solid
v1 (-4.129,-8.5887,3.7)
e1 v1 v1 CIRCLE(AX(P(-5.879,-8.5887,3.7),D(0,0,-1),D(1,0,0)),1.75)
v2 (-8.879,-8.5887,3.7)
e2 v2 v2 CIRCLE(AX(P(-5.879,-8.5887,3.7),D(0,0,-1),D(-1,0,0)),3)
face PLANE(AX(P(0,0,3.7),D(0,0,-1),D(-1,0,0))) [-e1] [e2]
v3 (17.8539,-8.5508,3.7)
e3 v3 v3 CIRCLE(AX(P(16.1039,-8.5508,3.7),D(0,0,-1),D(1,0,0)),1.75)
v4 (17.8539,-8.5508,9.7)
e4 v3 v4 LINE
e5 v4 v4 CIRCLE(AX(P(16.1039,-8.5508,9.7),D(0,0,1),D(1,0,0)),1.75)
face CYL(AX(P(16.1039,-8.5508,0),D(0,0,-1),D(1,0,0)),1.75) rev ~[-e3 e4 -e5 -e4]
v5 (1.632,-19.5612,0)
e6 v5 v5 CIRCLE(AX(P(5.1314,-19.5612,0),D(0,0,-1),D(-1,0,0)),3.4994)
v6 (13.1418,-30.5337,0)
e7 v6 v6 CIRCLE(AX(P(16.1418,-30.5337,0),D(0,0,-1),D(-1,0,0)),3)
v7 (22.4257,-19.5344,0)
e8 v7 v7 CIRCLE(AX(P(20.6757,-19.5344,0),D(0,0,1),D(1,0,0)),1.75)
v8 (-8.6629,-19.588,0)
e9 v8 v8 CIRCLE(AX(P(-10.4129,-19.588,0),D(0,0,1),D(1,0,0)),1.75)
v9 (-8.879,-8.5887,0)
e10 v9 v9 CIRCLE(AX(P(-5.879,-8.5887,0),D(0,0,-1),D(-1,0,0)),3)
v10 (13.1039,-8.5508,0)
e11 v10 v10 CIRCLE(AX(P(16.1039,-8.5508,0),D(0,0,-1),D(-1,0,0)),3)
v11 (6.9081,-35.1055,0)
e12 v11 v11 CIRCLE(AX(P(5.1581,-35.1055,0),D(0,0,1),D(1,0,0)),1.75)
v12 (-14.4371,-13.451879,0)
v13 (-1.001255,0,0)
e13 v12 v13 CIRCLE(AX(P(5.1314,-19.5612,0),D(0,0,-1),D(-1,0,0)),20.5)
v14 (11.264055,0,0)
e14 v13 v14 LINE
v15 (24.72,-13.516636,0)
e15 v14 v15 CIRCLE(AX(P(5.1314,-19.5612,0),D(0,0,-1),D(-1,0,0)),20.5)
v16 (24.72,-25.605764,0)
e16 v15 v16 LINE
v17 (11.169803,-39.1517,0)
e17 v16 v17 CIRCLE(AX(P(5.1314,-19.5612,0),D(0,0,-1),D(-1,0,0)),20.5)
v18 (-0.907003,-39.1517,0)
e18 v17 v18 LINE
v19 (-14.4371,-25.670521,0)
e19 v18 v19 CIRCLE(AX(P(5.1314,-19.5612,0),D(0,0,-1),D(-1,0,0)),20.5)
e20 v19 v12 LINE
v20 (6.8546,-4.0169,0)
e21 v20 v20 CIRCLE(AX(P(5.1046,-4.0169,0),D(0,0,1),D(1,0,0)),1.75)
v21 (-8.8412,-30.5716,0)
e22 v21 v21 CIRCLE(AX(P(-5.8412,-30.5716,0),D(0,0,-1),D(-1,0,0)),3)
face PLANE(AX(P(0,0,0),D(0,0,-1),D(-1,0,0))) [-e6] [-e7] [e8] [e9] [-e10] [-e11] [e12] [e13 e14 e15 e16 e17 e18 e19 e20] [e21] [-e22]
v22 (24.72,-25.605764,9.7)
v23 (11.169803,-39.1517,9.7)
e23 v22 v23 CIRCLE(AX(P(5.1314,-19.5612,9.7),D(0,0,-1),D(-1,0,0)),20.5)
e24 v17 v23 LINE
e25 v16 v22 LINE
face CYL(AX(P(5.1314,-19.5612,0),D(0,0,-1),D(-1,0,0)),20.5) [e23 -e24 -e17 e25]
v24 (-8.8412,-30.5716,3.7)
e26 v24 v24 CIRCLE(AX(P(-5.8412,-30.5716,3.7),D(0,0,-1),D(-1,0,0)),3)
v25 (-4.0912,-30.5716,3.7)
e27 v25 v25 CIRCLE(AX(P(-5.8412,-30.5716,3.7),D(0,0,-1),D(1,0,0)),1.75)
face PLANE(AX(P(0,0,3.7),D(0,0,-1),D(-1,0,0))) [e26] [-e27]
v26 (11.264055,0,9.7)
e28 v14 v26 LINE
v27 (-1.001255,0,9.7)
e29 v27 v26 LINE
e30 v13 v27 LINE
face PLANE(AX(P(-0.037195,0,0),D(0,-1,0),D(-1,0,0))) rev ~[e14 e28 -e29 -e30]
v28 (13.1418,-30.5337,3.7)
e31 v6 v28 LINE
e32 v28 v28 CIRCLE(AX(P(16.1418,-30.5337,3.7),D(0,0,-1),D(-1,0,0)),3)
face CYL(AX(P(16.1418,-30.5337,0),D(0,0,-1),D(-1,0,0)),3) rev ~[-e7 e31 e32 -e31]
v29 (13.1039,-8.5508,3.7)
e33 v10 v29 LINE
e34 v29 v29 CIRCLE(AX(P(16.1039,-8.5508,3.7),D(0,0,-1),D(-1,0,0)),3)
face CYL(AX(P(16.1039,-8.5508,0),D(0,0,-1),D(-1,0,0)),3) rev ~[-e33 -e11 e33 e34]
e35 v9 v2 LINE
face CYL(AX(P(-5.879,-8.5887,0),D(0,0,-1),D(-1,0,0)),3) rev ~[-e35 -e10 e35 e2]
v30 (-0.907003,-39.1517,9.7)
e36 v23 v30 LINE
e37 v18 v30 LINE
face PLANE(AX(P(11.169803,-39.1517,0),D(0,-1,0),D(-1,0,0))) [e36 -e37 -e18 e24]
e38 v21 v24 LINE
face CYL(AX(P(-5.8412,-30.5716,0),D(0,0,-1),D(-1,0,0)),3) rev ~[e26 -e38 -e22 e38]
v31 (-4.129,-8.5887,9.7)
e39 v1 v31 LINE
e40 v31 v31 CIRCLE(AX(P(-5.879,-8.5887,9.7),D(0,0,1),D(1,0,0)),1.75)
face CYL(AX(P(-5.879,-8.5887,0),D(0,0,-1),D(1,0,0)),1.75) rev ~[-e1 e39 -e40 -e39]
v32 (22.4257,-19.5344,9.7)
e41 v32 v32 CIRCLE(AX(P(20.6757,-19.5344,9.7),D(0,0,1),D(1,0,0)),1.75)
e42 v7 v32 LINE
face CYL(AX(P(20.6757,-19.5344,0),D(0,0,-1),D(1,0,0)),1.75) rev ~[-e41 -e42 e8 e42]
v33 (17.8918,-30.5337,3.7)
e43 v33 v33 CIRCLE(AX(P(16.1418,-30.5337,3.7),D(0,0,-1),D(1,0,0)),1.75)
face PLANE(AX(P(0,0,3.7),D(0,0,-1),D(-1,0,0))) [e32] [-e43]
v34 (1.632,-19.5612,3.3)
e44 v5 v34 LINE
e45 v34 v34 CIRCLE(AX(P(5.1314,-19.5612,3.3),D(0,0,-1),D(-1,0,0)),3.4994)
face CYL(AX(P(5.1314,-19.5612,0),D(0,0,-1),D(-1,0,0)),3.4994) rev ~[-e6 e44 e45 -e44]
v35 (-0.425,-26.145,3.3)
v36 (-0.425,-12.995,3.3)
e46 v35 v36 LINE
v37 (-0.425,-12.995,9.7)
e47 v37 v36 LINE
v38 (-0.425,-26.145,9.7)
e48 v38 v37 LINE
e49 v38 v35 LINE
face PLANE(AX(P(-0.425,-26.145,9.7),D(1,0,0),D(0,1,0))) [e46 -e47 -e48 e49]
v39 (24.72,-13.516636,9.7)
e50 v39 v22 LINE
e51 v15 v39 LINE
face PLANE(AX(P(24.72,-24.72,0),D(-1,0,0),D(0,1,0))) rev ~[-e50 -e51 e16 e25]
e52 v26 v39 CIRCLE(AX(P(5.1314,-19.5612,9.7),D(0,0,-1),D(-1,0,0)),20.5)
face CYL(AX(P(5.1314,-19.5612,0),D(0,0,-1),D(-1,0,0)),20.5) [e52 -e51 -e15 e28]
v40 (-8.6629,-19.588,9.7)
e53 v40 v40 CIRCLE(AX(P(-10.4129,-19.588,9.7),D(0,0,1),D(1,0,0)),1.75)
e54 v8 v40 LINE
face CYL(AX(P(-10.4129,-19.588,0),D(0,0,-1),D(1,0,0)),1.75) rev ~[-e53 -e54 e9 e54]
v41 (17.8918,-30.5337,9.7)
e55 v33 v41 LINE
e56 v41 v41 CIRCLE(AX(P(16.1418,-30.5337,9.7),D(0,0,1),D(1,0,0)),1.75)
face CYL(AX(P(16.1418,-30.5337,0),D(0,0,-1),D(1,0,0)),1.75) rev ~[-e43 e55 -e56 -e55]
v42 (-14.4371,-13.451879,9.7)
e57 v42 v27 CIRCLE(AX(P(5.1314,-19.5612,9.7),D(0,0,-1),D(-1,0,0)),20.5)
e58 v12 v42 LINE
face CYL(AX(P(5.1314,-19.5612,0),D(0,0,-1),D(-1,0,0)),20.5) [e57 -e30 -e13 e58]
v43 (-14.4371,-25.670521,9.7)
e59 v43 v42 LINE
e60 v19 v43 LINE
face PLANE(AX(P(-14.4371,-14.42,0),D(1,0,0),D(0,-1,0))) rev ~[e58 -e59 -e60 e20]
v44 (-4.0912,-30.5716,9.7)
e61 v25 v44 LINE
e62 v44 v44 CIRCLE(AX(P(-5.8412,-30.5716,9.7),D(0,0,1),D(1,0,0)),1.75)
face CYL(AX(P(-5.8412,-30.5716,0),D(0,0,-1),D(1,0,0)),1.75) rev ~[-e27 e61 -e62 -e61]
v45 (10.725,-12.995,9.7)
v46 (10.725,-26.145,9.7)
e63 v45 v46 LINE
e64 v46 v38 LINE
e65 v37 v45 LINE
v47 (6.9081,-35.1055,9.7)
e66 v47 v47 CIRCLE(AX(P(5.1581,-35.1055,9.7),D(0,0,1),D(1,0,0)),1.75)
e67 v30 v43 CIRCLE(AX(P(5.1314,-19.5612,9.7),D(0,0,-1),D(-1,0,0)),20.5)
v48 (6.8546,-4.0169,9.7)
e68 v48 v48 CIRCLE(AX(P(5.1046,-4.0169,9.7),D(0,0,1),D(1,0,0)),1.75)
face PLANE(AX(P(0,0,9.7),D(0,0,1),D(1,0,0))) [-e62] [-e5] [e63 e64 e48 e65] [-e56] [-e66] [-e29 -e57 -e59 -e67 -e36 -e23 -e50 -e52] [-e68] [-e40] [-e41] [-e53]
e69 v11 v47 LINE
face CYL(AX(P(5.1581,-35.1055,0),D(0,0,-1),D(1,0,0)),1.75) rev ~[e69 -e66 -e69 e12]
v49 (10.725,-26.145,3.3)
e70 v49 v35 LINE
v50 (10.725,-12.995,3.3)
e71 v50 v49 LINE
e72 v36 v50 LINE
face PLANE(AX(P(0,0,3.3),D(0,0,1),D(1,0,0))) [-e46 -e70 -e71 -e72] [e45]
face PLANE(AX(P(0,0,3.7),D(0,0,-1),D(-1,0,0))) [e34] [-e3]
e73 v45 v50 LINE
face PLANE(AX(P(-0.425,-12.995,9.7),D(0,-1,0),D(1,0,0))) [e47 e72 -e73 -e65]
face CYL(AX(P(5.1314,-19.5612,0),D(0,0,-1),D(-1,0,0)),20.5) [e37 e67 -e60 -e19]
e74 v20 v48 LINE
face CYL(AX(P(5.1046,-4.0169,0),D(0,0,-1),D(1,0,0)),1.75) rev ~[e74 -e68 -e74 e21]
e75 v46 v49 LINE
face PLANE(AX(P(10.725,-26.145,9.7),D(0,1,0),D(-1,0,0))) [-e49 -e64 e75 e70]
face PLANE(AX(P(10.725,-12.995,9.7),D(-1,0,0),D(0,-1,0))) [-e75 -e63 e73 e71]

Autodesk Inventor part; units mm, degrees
ref_plane "YZ Plane" through (0, 0, 0) normal (1, 0, 0) x (0, 1, 0)
ref_plane "XZ Plane" through (0, 0, 0) normal (0, 1, 0) x (-1, 0, 0)
ref_plane "XY Plane" through (0, 0, 0) normal (0, 0, 1) x (1, 0, 0)
sketch "Szkic1" plane through (0, 0, 0) normal (0, 0, 1) x (1, 0, 0)
  line L0 (24.72, -24.72) -> (24.72, -14.42)
  line L1 (25.2197, -24.72) -> (24.72, -24.72)
  line L2 (24.72, -14.42) -> (25.2197, -14.42)
  line L3 (0, -39.14) -> (10.3, -39.14)
  line L4 (-14.42, -14.42) -> (-14.42, -24.72)
  line L5 (10.3, 0) -> (0, 0)
  line L6 (10.225, -25.645) -> (10.225, -13.495)
  line L7 (10.225, -25.645) -> (0.075, -25.645)
  line L8 (0.075, -13.495) -> (0.075, -25.645)
  line L9 (0.075, -13.495) -> (10.225, -13.495)
  line L10 (-14.9619, -24.72) -> (-14.9619, -24.7024)
  arc A0 (-14.9619, -24.7024) -> (0.075, -39.676) centre (5.1314, -19.5612) ccw
  arc A1 (10.3, -39.6475) -> (25.2201, -24.72) centre (5.1314, -19.5612) ccw
  line L11 (-14.9619, -14.42) -> (-14.42, -14.42)
  line L12 (24.72, -14.42) -> (25.2247, -14.42)
  line L13 (-14.42, -24.72) -> (-14.9619, -24.72)
  line L14 (0.075, -39.14) -> (0.075, -39.676)
  line L15 (0.075, 0.5536) -> (0.075, 0)
  line L16 (0.075, -13.495) -> (0.075, -25.645)
  line L17 (10.3, -39.6475) -> (10.3, -39.14)
  line L18 (10.3, 0) -> (10.3, 0.5251)
  line L19 (25.2201, -24.72) -> (24.72, -24.72)
  arc A2 (25.2247, -14.42) -> (10.3, 0.5251) centre (5.1314, -19.5612) ccw
  arc A3 (0.075, 0.5536) -> (-14.9619, -14.42) centre (5.1314, -19.5612) ccw
  circle A4 centre (5.1581, -35.1055) radius 1.75
  circle A5 centre (16.1418, -30.5337) radius 1.75
  circle A6 centre (20.6757, -19.5344) radius 1.75
  circle A7 centre (16.1039, -8.5508) radius 1.75
  circle A8 centre (5.1046, -4.0169) radius 1.75
  circle A9 centre (-5.879, -8.5887) radius 1.75
  circle A10 centre (-10.4129, -19.588) radius 1.75
  circle A11 centre (-5.8412, -30.5716) radius 1.75
  point P0 (5.15, -19.57)
  point P1 (-14.9574, -24.72)
  dimension "d0" = 3.5
  dimension "d3" = 360
extrude "Wyciągnięcie proste1" add sketch "Szkic1" along normal blind 9.7 contours L1 A1 L17 L3 L14 A0 L13 L4 L11 A3 L15 L5 L18 A2 L12 L2 L0
sketch "Szkic2" plane through (0, 0, 0) normal (0, 0, -1) x (-1, 0, 0)
  circle A0 centre (-16.1039, -8.5508) radius 1.75 projected
  circle A1 centre (-16.1039, -8.5508) radius 3
  arc A2 (-10.3, 0.5251) -> (-25.2247, -14.42) centre (-5.1314, -19.5612) ccw projected
  arc A3 (-0.075, -39.676) -> (14.9574, -24.72) centre (-5.1314, -19.5612) ccw projected
  circle A4 centre (-16.1418, -30.5337) radius 3
  circle A5 centre (5.8412, -30.5716) radius 3
  circle A6 centre (5.879, -8.5887) radius 3
  point P0 (0, 0)
  dimension "d7" = 6
  dimension "d10" = 360
extrude "Wyciągnięcie proste2" cut sketch "Szkic2" against normal blind 3.7
sketch "Szkic3" plane through (0, 0, 0) normal (0, 0, -1) x (-1, 0, 0)
  circle A0 centre (5.8412, -30.5716) radius 3 projected
  circle A1 centre (5.879, -8.5887) radius 3 projected
  circle A2 centre (-16.1418, -30.5337) radius 3 projected
  circle A3 centre (-16.1039, -8.5508) radius 3 projected
  line L0 (-24.72, -14.42) -> (-25.2247, -14.42) projected
  line L1 (-24.72, -24.72) -> (-24.72, -14.42) projected
  line L2 (-25.2201, -24.72) -> (-24.72, -24.72) projected
  arc A4 (-25.2201, -24.72) -> (-10.3, -39.6475) centre (-5.1314, -19.5612) ccw projected
  line L3 (-10.3, -39.14) -> (-10.3, -39.6475) projected
  line L4 (-0.075, -39.14) -> (-10.3, -39.14) projected
  line L5 (-0.075, -39.676) -> (-0.075, -39.14) projected
  arc A5 (-0.075, -39.676) -> (14.9574, -24.72) centre (-5.1314, -19.5612) ccw projected
  line L6 (14.42, -24.72) -> (14.9574, -24.72) projected
  line L7 (14.42, -14.42) -> (14.42, -24.72) projected
  line L8 (14.9619, -14.42) -> (14.42, -14.42) projected
  arc A6 (14.9619, -14.42) -> (-0.075, 0.5536) centre (-5.1314, -19.5612) ccw projected
  line L9 (-0.075, 0) -> (-0.075, 0.5536) projected
  line L10 (-10.3, 0) -> (-0.075, 0) projected
  line L11 (-10.3, 0.5251) -> (-10.3, 0) projected
  arc A7 (-10.3, 0.5251) -> (-25.2247, -14.42) centre (-5.1314, -19.5612) ccw projected
  circle A8 centre (10.4129, -19.588) radius 1.75 projected
  circle A9 centre (-5.1581, -35.1055) radius 1.75 projected
  circle A10 centre (-20.6757, -19.5344) radius 1.75 projected
  circle A11 centre (-5.1046, -4.0169) radius 1.75 projected
  line L12 (-10.225, -25.645) -> (-0.075, -25.645) projected
  line L13 (-10.225, -13.495) -> (-10.225, -25.645) projected
  line L14 (-0.075, -13.495) -> (-10.225, -13.495) projected
  line L15 (-0.075, -25.645) -> (-0.075, -13.495) projected
  line L16 (-10.225, -13.495) -> (-8.225, -13.495)
  line L17 (-8.225, -13.495) -> (-8.225, -25.645)
  line L18 (-8.225, -25.645) -> (-10.225, -25.645)
  line L19 (-10.225, -25.645) -> (-10.225, -13.495)
  line L20 (-0.075, -25.645) -> (-2.075, -25.645)
  line L21 (-2.075, -25.645) -> (-2.075, -13.495)
  line L22 (-2.075, -13.495) -> (-0.075, -13.495)
  line L23 (-0.075, -13.495) -> (-0.075, -25.645)
  point P0 (0, 0)
  dimension "d14" = 2
  dimension "d15" = 2
extrude "Wyciągnięcie proste3" add sketch "Szkic3" against normal blind 4.7 contours L13 L14 L17 L12 | L21 L14 L15 L12
sketch "Szkic4" plane through (0, 0, 9.7) normal (0, 0, 1) x (1, 0, 0)
  line L0 (24.72, -14.42) -> (25.2247, -14.42) projected
  arc A0 (25.2247, -14.42) -> (10.3, 0.5251) centre (5.1314, -19.5612) ccw projected
  line L1 (10.3, 0.5251) -> (10.3, 0) projected
  line L2 (10.3, 0) -> (0.075, 0) projected
  line L3 (0.075, 0) -> (0.075, 0.5536) projected
  arc A1 (0.075, 0.5536) -> (-14.9619, -14.42) centre (5.1314, -19.5612) ccw projected
  line L4 (-14.9619, -14.42) -> (-14.42, -14.42) projected
  line L5 (-14.42, -14.42) -> (-14.42, -24.72) projected
  line L6 (-14.42, -24.72) -> (-14.9574, -24.72) projected
  arc A2 (-14.9574, -24.72) -> (0.075, -39.676) centre (5.1314, -19.5612) ccw projected
  line L7 (0.075, -39.676) -> (0.075, -39.14) projected
  line L8 (0.075, -39.14) -> (10.3, -39.14) projected
  line L9 (10.3, -39.14) -> (10.3, -39.6475) projected
  arc A3 (10.3, -39.6475) -> (25.2201, -24.72) centre (5.1314, -19.5612) ccw projected
  line L10 (25.2201, -24.72) -> (24.72, -24.72) projected
  line L11 (24.72, -24.72) -> (24.72, -14.42) projected
  circle A4 centre (-10.4129, -19.588) radius 1.75 projected
  circle A5 centre (5.1581, -35.1055) radius 1.75 projected
  circle A6 centre (20.6757, -19.5344) radius 1.75 projected
  circle A7 centre (5.1046, -4.0169) radius 1.75 projected
  circle A8 centre (-5.8412, -30.5716) radius 1.75 projected
  circle A9 centre (-5.879, -8.5887) radius 1.75 projected
  circle A10 centre (16.1039, -8.5508) radius 1.75 projected
  circle A11 centre (16.1418, -30.5337) radius 1.75 projected
  line L12 (10.225, -25.645) -> (0.075, -25.645) projected
  line L13 (0.075, -25.645) -> (0.075, -13.495) projected
  line L14 (0.075, -13.495) -> (10.225, -13.495) projected
  line L15 (10.225, -13.495) -> (10.225, -25.645) projected
  line L16 (10.3, 0.5251) -> (10.3, 0) projected
  line L17 (10.3, 0.5251) -> (0.075, 0.5536)
  line L18 (10.3, 0) -> (0.075, 0) projected
  circle A12 centre (5.1314, -19.5612) radius 20.2325
  point P0 (0, 0)
  point P1 (-14.4371, -14.42)
  point P2 (0.075, 0.0293)
  point P3 (0.075, -39.1517)
  point P4 (-14.4324, -24.72)
  point P5 (24.72, -24.6249)
  point P6 (10.2329, -39.14)
  point P7 (24.72, -14.4975)
extrude "Wyciągnięcie proste4" cut sketch "Szkic4" against normal through all contours L11 A12 L1 A0 L0 | L11 L10 A3 L9 L8 A12 | L7 A2 L6 A12 | A12 L4 A1 L3
sketch "Szkic5" plane through (0, 0, 0) normal (0, 0, -1) x (-1, 0, 0)
  line L0 (-10.225, -13.495) -> (-10.225, -25.645) projected
  line L1 (-8.225, -13.495) -> (-10.225, -13.495) projected
  line L2 (-2.075, -13.495) -> (-8.225, -13.495) projected
  line L3 (-0.075, -13.495) -> (-2.075, -13.495) projected
  line L4 (-0.075, -25.645) -> (-0.075, -13.495) projected
  line L5 (-2.075, -25.645) -> (-0.075, -25.645) projected
  line L6 (-8.225, -25.645) -> (-2.075, -25.645) projected
  line L7 (-10.225, -25.645) -> (-8.225, -25.645) projected
  line L8 (-10.2317, -25.6607) -> (-10.2317, -13.4607)
  line L9 (-0.0317, -13.4607) -> (-10.2317, -13.4607)
  circle A0 centre (-5.1314, -15.0608) radius 0.8097
  line L10 (-0.0317, -25.6607) -> (-0.0317, -13.4607)
  line L11 (-10.2317, -25.6607) -> (-0.0317, -25.6607)
  circle A1 centre (-5.1314, -19.5612) radius 3.4994
  circle A2 centre (-5.1314, -24.061) radius 0.8096
  arc A3 (-10.3, 0) -> (-24.72, -14.4975) centre (-5.1314, -19.5612) ccw projected
  point P0 (0, 0)
  point P1 (-5.1317, -19.5607)
extrude "Wyciągnięcie proste5" cut sketch "Szkic5" against normal through all contours L1 L2 L3 L4 L5 L6 L7 L0 | A1
extrude "Wyciągnięcie proste6" add sketch "Szkic5" against normal blind 7.3 contours L1 L2 L3 L4 L5 L6 L7 L0
sketch "Szkic6" plane through (0, 0, 0) normal (0, 0, -1) x (-1, 0, 0)
  arc A0 (-10.3, 0) -> (-24.72, -14.4975) centre (-5.1314, -19.5612) ccw projected
  circle A1 centre (-5.1314, -19.5612) radius 3.4994 projected
  circle A2 centre (-5.1314, -19.5612) radius 20.5
  circle A3 centre (-5.1314, -24.061) radius 0.8096 projected
  circle A4 centre (-5.1314, -19.5612) radius 3.4994 projected
  circle A5 centre (-5.1314, -15.0608) radius 0.8097 projected
  circle A6 centre (-5.1046, -4.0169) radius 1.75 projected
  circle A7 centre (-20.6757, -19.5344) radius 1.75 projected
  circle A8 centre (-5.1581, -35.1055) radius 1.75 projected
  circle A9 centre (10.4129, -19.588) radius 1.75 projected
  circle A10 centre (-16.1039, -8.5508) radius 3 projected
  circle A11 centre (-16.1418, -30.5337) radius 3 projected
  circle A12 centre (5.879, -8.5887) radius 3 projected
  circle A13 centre (5.8412, -30.5716) radius 3 projected
  arc A14 (-0.075, -39.1517) -> (14.4324, -24.72) centre (-5.1314, -19.5612) ccw projected
  line L0 (14.42, -24.72) -> (14.4324, -24.72) projected
  line L1 (14.42, -14.42) -> (14.42, -24.72) projected
  line L2 (14.4371, -14.42) -> (14.42, -14.42) projected
  arc A15 (14.4371, -14.42) -> (-0.075, 0.0293) centre (-5.1314, -19.5612) ccw projected
  line L3 (-0.075, 0) -> (-0.075, 0.0293) projected
  line L4 (-10.3, 0) -> (-0.075, 0) projected
  arc A16 (-10.3, 0) -> (-24.72, -14.4975) centre (-5.1314, -19.5612) ccw projected
  line L5 (-24.72, -24.6249) -> (-24.72, -14.4975) projected
  arc A17 (-24.72, -24.6249) -> (-10.2329, -39.14) centre (-5.1314, -19.5612) ccw projected
  line L6 (-0.075, -39.14) -> (-10.2329, -39.14) projected
  line L7 (-0.075, -39.1517) -> (-0.075, -39.14) projected
  line L8 (-24.72, -6.5254) -> (-24.72, -33.3555)
  line L9 (14.4371, -5.2931) -> (14.4371, -36.8555)
  line L10 (-20.6757, -39.1517) -> (13.3882, -39.1517)
  line L11 (-24, 0) -> (14, 0)
  point P0 (0, 0)
  point P1 (-24.72, -25.6056)
  point P2 (-11.1697, -39.1517)
  point P3 (-0.075, -39.1517)
  point P4 (-0.075, -39.1517)
  point P5 (0.907, -39.1517)
  point P6 (14.4371, -25.6707)
  point P7 (1.0013, 0)
  point P8 (0.0373, 0)
  point P9 (14.4371, -13.4517)
  point P10 (-11.264, 0)
  point P11 (-24.72, -13.5168)
  dimension "d24" = 41
extrude "Wyciągnięcie proste7" add sketch "Szkic6" against normal up to surface (9.7 mm away) contours A0 L8 A2 L11 | A17 L6 L7 L10 A2 L8 | L11 A2 L9 A15 | L9 A2 L10 A14 L0 L1 L2
sketch "Szkic7" plane through (0, 0, 9.7) normal (0, 0, 1) x (1, 0, 0)
  line L0 (10.225, -25.645) -> (0.075, -25.645) projected
  line L1 (0.075, -25.645) -> (0.075, -13.495) projected
  line L2 (0.075, -13.495) -> (10.225, -13.495) projected
  line L3 (10.225, -13.495) -> (10.225, -25.645) projected
  circle A0 centre (16.1418, -30.5337) radius 1.75 projected
  circle A1 centre (16.1039, -8.5508) radius 1.75 projected
  circle A2 centre (-5.879, -8.5887) radius 1.75 projected
  circle A3 centre (-5.8412, -30.5716) radius 1.75 projected
  circle A4 centre (5.1046, -4.0169) radius 1.75 projected
  circle A5 centre (20.6757, -19.5344) radius 1.75 projected
  circle A6 centre (5.1581, -35.1055) radius 1.75 projected
  circle A7 centre (-10.4129, -19.588) radius 1.75 projected
  line L4 (24.72, -13.5168) -> (24.72, -25.6056) projected
  arc A8 (24.72, -13.5168) -> (11.264, 0) centre (5.1314, -19.5612) ccw projected
  line L5 (0.075, 0) -> (11.264, 0) projected
  line L6 (0.075, 0) -> (0.075, 0.0293) projected
  arc A9 (0.075, 0.0293) -> (-0.0373, 0) centre (5.1314, -19.5612) ccw projected
  line L7 (-1.0013, 0) -> (-0.0373, 0) projected
  arc A10 (-1.0013, 0) -> (-14.4371, -13.4517) centre (5.1314, -19.5612) ccw projected
  line L8 (-14.4371, -25.6707) -> (-14.4371, -13.4517) projected
  arc A11 (-14.4371, -25.6707) -> (-0.907, -39.1517) centre (5.1314, -19.5612) ccw projected
  line L9 (11.1697, -39.1517) -> (-0.907, -39.1517) projected
  arc A12 (11.1697, -39.1517) -> (24.72, -25.6056) centre (5.1314, -19.5612) ccw projected
  line L10 (0.075, 0) -> (-0.0373, 0)
  point P0 (0, 0)
extrude "Wyciągnięcie proste8" cut sketch "Szkic7" against normal through all contours L10 A9 L6
sketch "Szkic8" plane through (0, 0, 7.3) normal (0, 0, 1) x (1, 0, 0)
  line L0 (10.225, -25.645) -> (0.075, -25.645) projected
  line L1 (10.225, -13.495) -> (10.225, -25.645) projected
  line L2 (0.075, -13.495) -> (10.225, -13.495) projected
  line L3 (0.075, -25.645) -> (0.075, -13.495) projected
  circle A0 centre (5.1314, -15.0608) radius 0.8097 projected
  circle A1 centre (5.1314, -19.5612) radius 3.4994 projected
  circle A2 centre (5.1314, -24.061) radius 0.8096 projected
  point P0 (0, 0)
extrude "Wyciągnięcie proste9" cut sketch "Szkic8" against normal blind 4
sketch "Szkic9" plane through (0, 0, 0) normal (0, 0, -1) x (-1, 0, 0)
  circle A0 centre (-5.1314, -15.0608) radius 0.8097 projected
  circle A1 centre (-5.1314, -24.061) radius 0.8096 projected
  point P0 (0, 0)
extrude "Wyciągnięcie proste10" add sketch "Szkic9" against normal up to surface (3.3 mm away)
sketch "Szkic10" plane through (0, 0, 9.7) normal (0, 0, 1) x (1, 0, 0)
  line L0 (0.075, -25.645) -> (0.075, -13.495) projected
  line L1 (10.225, -25.645) -> (0.075, -25.645) projected
  line L2 (10.225, -13.495) -> (10.225, -25.645) projected
  line L3 (0.075, -13.495) -> (10.225, -13.495) projected
  line L4 (10.725, -26.145) -> (-0.425, -26.145)
  line L5 (-0.425, -26.145) -> (-0.425, -12.995)
  line L6 (-0.425, -12.995) -> (10.725, -12.995)
  line L7 (10.725, -12.995) -> (10.725, -26.145)
  point P0 (0, 0)
  dimension "d33" = 0.5
extrude "Wyciągnięcie proste11" cut sketch "Szkic10" against normal up to surface (6.4 mm away) contours L0 L3 L2 L1 | L4 L5 L6 L7
properties part number "GripperBaseCircularUpper"
